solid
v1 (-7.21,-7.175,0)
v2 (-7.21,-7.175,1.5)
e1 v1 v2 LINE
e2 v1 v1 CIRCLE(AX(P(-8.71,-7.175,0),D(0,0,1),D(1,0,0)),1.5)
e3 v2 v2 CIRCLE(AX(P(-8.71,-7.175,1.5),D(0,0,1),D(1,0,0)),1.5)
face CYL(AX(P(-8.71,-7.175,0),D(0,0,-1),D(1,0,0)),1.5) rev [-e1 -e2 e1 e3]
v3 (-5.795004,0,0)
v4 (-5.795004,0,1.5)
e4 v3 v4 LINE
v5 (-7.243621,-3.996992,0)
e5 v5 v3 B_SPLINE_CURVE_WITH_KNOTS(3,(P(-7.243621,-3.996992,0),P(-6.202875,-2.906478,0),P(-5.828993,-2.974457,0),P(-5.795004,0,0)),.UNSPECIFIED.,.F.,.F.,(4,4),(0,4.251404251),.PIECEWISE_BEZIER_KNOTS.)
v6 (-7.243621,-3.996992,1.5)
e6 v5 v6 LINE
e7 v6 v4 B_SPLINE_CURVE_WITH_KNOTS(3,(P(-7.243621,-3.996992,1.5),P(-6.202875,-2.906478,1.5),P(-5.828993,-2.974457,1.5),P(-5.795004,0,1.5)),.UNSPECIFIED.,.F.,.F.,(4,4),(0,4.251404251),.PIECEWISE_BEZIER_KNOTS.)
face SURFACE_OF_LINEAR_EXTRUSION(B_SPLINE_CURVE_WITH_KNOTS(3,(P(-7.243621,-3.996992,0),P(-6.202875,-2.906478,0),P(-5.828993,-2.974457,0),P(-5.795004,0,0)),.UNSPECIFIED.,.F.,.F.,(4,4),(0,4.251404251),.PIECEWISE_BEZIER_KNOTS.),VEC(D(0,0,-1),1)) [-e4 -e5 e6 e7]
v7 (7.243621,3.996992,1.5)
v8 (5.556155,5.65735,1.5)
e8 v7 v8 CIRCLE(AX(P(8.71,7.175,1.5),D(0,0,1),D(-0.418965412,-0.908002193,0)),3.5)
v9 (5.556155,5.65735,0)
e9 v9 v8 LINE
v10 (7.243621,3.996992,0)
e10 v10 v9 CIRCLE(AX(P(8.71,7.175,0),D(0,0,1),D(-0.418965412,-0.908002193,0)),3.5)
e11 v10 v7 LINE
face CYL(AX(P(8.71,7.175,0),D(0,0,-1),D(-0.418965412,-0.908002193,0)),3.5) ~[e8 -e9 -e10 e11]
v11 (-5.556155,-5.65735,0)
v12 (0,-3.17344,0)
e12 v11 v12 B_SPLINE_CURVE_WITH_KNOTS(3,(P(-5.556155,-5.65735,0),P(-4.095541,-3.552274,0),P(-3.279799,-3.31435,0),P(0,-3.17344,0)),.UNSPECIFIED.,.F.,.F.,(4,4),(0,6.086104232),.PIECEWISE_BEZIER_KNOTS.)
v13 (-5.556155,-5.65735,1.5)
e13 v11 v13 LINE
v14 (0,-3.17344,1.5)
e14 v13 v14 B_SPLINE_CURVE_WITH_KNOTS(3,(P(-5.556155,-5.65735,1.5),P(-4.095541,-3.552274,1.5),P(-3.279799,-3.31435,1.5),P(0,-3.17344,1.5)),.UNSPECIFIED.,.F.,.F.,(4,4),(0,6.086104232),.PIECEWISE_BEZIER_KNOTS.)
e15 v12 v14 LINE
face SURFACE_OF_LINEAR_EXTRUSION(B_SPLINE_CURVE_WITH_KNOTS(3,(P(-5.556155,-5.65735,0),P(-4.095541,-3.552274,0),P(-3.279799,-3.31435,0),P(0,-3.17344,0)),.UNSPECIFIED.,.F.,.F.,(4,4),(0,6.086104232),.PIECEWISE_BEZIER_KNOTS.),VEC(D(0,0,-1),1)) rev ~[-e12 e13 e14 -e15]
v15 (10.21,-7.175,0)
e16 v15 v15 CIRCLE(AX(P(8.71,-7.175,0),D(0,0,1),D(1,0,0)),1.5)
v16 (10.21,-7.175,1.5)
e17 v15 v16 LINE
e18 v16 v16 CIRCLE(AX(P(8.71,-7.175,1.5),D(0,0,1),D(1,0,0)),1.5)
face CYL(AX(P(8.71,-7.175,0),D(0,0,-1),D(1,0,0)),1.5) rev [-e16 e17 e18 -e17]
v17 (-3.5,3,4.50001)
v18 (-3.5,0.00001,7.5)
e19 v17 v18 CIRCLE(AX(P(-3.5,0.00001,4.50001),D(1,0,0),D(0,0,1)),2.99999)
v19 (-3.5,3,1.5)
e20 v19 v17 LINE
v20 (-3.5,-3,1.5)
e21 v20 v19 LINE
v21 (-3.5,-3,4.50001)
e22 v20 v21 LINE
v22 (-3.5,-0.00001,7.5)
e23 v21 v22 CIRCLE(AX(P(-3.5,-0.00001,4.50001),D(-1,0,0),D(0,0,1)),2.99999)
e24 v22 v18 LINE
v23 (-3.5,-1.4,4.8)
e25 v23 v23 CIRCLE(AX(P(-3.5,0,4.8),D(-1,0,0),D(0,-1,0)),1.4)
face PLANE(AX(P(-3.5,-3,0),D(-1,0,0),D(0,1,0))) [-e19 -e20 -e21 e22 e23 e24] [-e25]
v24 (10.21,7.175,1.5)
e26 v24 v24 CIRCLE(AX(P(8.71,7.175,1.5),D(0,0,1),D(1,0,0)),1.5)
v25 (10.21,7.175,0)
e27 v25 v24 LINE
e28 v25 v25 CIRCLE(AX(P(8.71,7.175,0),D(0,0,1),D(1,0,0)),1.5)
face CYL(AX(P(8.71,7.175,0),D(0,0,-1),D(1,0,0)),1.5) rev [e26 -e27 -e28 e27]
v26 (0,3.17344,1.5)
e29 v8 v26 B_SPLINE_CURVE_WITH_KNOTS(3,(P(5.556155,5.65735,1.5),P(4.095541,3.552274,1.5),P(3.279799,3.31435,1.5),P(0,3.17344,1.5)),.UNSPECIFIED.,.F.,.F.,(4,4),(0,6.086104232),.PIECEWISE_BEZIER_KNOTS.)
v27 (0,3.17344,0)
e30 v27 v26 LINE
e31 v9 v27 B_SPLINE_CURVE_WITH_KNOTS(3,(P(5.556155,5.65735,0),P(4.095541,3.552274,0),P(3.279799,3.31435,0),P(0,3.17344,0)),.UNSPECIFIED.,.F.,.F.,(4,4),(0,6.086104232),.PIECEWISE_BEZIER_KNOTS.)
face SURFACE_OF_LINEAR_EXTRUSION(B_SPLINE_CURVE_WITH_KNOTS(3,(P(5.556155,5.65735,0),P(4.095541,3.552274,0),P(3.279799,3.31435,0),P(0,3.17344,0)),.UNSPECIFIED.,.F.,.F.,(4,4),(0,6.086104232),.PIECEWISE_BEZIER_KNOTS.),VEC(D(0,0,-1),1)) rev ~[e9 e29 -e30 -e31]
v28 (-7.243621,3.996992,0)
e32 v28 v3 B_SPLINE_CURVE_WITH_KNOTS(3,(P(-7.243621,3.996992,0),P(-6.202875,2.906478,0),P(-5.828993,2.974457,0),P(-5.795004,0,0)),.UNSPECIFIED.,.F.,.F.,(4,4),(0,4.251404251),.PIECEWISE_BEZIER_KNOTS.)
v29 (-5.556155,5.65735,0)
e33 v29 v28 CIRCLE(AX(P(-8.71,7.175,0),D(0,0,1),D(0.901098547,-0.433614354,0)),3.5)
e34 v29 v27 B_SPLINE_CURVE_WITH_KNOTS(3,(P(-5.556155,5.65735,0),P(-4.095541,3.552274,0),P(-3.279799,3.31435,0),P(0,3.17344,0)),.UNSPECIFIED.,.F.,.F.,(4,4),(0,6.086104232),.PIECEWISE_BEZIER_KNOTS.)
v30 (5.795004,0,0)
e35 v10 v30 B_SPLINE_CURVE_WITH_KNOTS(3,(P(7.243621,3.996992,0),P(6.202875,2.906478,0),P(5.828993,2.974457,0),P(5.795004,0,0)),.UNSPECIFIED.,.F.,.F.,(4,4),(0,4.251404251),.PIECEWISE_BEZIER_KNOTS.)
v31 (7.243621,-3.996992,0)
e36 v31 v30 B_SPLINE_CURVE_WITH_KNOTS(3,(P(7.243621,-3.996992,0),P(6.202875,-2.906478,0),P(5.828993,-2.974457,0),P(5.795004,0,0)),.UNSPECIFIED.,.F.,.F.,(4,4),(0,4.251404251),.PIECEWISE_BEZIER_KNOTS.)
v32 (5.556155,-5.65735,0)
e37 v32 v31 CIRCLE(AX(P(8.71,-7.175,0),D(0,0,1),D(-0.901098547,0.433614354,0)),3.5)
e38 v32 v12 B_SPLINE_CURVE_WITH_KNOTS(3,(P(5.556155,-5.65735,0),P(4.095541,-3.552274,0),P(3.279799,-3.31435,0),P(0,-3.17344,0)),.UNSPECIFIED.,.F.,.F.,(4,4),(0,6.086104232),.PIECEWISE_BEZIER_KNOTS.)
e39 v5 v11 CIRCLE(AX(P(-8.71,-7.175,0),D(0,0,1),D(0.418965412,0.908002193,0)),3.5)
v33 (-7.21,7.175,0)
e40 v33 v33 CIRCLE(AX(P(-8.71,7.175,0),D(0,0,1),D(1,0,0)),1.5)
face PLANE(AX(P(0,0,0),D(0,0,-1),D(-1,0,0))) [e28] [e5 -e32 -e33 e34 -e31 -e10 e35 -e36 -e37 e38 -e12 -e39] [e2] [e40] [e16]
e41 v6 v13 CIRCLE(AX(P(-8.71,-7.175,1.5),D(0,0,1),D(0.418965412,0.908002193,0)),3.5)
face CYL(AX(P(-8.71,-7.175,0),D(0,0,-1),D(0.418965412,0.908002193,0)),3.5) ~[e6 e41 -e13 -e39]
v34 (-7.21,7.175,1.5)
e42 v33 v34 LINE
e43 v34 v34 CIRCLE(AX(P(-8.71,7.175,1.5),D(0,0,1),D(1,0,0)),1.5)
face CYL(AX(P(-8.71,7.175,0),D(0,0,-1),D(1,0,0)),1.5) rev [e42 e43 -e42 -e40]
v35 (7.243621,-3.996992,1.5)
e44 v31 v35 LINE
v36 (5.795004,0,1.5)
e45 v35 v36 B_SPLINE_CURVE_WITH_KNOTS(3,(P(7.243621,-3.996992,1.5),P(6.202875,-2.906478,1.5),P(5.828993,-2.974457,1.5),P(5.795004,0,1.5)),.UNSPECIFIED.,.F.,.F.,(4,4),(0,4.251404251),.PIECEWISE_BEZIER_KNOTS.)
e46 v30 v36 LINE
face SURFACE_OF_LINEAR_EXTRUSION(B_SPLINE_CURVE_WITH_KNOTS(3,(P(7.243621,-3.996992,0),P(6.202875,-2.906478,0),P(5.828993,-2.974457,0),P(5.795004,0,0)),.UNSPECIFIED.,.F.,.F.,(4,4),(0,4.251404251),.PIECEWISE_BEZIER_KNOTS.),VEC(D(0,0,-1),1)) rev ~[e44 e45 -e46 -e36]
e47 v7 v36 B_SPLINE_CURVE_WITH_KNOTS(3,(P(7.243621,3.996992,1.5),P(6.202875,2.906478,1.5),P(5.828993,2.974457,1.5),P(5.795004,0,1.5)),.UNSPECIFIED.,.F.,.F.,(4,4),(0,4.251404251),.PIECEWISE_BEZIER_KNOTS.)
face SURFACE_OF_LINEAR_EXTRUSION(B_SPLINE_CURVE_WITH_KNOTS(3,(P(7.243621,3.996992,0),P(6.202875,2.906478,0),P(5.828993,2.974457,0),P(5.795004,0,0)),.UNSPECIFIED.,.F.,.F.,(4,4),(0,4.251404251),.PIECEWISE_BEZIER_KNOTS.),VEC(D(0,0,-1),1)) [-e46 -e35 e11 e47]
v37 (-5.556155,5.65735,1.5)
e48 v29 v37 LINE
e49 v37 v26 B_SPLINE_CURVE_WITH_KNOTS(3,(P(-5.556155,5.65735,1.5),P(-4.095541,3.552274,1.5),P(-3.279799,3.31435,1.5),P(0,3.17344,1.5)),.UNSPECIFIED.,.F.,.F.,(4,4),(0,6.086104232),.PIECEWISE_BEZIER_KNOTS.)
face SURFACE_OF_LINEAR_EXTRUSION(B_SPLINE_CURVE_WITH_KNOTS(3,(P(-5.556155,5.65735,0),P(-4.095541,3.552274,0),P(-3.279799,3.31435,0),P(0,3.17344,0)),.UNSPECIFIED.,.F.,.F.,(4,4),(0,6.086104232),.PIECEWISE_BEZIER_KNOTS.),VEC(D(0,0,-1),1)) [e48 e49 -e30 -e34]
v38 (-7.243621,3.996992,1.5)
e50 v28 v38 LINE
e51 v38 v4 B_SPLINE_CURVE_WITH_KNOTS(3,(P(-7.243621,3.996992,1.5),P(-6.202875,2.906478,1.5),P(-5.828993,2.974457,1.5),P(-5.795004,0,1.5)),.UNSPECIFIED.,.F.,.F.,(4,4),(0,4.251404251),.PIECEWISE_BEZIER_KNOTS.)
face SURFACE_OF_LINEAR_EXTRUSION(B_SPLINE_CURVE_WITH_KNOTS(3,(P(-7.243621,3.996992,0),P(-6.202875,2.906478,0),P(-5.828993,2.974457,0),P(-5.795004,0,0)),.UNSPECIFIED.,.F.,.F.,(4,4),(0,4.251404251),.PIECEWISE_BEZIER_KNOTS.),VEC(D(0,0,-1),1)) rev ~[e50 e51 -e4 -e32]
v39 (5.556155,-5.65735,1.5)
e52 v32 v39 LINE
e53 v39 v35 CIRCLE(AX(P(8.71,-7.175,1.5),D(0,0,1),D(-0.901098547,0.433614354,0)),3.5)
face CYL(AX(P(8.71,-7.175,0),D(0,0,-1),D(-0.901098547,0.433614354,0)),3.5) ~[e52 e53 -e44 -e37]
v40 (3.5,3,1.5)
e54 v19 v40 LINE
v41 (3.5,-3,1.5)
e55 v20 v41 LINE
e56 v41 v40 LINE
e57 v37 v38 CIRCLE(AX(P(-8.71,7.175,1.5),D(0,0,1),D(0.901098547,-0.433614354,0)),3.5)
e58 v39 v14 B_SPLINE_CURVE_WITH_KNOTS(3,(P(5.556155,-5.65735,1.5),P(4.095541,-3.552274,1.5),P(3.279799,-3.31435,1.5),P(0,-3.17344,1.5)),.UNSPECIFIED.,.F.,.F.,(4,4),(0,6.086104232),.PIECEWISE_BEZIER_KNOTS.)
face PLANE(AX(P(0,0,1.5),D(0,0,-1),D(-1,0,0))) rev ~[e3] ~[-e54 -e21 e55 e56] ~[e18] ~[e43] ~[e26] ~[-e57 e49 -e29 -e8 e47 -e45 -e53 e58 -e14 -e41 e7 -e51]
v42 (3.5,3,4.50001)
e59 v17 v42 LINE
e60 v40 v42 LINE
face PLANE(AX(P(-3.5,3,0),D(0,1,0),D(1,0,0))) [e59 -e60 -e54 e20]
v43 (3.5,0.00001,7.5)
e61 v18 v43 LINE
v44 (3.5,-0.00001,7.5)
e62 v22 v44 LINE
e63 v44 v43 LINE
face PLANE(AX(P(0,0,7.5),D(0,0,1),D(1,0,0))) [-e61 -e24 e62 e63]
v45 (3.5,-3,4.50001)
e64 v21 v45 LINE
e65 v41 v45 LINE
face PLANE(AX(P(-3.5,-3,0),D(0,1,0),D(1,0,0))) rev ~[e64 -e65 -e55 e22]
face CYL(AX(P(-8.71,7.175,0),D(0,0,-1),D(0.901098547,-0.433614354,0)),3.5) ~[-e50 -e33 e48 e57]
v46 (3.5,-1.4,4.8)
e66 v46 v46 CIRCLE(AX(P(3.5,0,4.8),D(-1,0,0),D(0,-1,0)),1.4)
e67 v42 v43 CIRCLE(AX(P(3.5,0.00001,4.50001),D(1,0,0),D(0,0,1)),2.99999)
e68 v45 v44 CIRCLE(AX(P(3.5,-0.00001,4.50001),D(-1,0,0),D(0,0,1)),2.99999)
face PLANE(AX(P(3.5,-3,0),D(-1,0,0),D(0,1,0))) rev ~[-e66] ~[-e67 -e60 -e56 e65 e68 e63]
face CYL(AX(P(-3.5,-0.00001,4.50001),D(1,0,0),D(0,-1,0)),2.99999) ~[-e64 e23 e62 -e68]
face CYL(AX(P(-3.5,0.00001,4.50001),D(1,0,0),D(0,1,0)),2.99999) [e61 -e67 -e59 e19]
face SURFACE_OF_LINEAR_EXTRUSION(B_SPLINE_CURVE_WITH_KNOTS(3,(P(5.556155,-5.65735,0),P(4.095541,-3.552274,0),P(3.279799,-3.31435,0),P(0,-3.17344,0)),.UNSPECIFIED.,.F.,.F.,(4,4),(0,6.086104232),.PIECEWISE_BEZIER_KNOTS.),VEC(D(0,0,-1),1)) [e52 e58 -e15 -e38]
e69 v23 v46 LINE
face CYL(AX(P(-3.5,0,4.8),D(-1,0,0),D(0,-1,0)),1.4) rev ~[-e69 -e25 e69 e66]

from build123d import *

# Parameters (mm, degrees)
F0_R     = 1.5
F0_W     = 7
F0_H     = 6
F1_DEPTH = 1.5
F2_DEPTH = 7.5
F3_R     = 1.4
F4_DEPTH = 25
F5_R     = 2.99999


# Not quite as in the source:
# - a fillet or chamfer is up to 0.001 mm smaller than in the source, because OpenCascade refuses the exact size


with BuildPart() as f1:
    # F0 (on Top) → F1 (new body)
    with BuildSketch(Plane.XY):
        with BuildLine():
            add(Edge.make_bspline(
                [(-5.5561550838, 5.6573497621), (-4.0955413133, 3.5522743128), (-3.2797986642, 3.3143495675), (0, 3.173440462)],
                knots=[0, 0, 0, 0, 6.0861042323, 6.0861042323, 6.0861042323, 6.0861042323], degree=3))
            ThreePointArc((-5.5561550838, 5.6573497621), (-11.1647533144, 9.6698318912), (-7.2436210565, 3.9969923231))
            add(Edge.make_bspline(
                [(-7.2436210565, 3.9969923231), (-6.2028751709, 2.9064782429), (-5.828993395, 2.9744568747), (-5.7950043119, 0)],
                knots=[0, 0, 0, 0, 4.2514042508, 4.2514042508, 4.2514042508, 4.2514042508], degree=3))
            add(Edge.make_bspline(
                [(-7.2436210565, -3.9969923231), (-6.2028751709, -2.9064782429), (-5.828993395, -2.9744568747), (-5.7950043119, 0)],
                knots=[0, 0, 0, 0, 4.2514042508, 4.2514042508, 4.2514042508, 4.2514042508], degree=3))
            ThreePointArc((-7.2436210565, -3.9969923231), (-11.1647533144, -9.6698318912), (-5.5561550838, -5.6573497621))
            add(Edge.make_bspline(
                [(-5.5561550838, -5.6573497621), (-4.0955413133, -3.5522743128), (-3.2797986642, -3.3143495675), (0, -3.173440462)],
                knots=[0, 0, 0, 0, 6.0861042323, 6.0861042323, 6.0861042323, 6.0861042323], degree=3))
            add(Edge.make_bspline(
                [(5.5561550838, -5.6573497621), (4.0955413133, -3.5522743128), (3.2797986642, -3.3143495675), (0, -3.173440462)],
                knots=[0, 0, 0, 0, 6.0861042323, 6.0861042323, 6.0861042323, 6.0861042323], degree=3))
            ThreePointArc((5.5561550838, -5.6573497621), (11.1647533144, -9.6698318912), (7.2436210565, -3.9969923231))
            add(Edge.make_bspline(
                [(7.2436210565, -3.9969923231), (6.2028751709, -2.9064782429), (5.828993395, -2.9744568747), (5.7950043119, 0)],
                knots=[0, 0, 0, 0, 4.2514042508, 4.2514042508, 4.2514042508, 4.2514042508], degree=3))
            add(Edge.make_bspline(
                [(7.2436210565, 3.9969923231), (6.2028751709, 2.9064782429), (5.828993395, 2.9744568747), (5.7950043119, 0)],
                knots=[0, 0, 0, 0, 4.2514042508, 4.2514042508, 4.2514042508, 4.2514042508], degree=3))
            ThreePointArc((7.2436210565, 3.9969923231), (11.1647533144, 9.6698318912), (5.5561550838, 5.6573497621))
            add(Edge.make_bspline(
                [(5.5561550838, 5.6573497621), (4.0955413133, 3.5522743128), (3.2797986642, 3.3143495675), (0, 3.173440462)],
                knots=[0, 0, 0, 0, 6.0861042323, 6.0861042323, 6.0861042323, 6.0861042323], degree=3))
        make_face()
        with Locations((-8.71, -7.175)):
            Circle(F0_R, mode=Mode.SUBTRACT)
        with Locations((8.71, -7.175)):
            Circle(F0_R, mode=Mode.SUBTRACT)
        with Locations((-8.71, 7.175)):
            Circle(F0_R, mode=Mode.SUBTRACT)
        Rectangle(F0_W, F0_H, mode=Mode.SUBTRACT)
        with Locations((8.71, 7.175)):
            Circle(F0_R, mode=Mode.SUBTRACT)
    extrude(amount=F1_DEPTH)

    # F0 (on Top) → F2 (join)
    with BuildSketch(Plane.XY):
        Rectangle(F0_W, F0_H)
    extrude(amount=F2_DEPTH)

    # F3 (on face) → F4 (cut)
    with BuildSketch(Plane(origin=(-3.5, 0, 0), x_dir=(0, -1, 0), z_dir=(-1, 0, 0))):
        with Locations((0, 4.8)):
            Circle(F3_R)
    extrude(amount=-F4_DEPTH, mode=Mode.SUBTRACT)

    # F5 (radius 3 in the source; OpenCascade refuses exactly that, so slightly less here)
    f5_edges = [f1.edges().sort_by_distance(p)[0] for p in [
        (0, 3, 7.5),
        (0, -3, 7.5),
    ]]
    fillet(f5_edges, radius=F5_R)


solid = f1.part
